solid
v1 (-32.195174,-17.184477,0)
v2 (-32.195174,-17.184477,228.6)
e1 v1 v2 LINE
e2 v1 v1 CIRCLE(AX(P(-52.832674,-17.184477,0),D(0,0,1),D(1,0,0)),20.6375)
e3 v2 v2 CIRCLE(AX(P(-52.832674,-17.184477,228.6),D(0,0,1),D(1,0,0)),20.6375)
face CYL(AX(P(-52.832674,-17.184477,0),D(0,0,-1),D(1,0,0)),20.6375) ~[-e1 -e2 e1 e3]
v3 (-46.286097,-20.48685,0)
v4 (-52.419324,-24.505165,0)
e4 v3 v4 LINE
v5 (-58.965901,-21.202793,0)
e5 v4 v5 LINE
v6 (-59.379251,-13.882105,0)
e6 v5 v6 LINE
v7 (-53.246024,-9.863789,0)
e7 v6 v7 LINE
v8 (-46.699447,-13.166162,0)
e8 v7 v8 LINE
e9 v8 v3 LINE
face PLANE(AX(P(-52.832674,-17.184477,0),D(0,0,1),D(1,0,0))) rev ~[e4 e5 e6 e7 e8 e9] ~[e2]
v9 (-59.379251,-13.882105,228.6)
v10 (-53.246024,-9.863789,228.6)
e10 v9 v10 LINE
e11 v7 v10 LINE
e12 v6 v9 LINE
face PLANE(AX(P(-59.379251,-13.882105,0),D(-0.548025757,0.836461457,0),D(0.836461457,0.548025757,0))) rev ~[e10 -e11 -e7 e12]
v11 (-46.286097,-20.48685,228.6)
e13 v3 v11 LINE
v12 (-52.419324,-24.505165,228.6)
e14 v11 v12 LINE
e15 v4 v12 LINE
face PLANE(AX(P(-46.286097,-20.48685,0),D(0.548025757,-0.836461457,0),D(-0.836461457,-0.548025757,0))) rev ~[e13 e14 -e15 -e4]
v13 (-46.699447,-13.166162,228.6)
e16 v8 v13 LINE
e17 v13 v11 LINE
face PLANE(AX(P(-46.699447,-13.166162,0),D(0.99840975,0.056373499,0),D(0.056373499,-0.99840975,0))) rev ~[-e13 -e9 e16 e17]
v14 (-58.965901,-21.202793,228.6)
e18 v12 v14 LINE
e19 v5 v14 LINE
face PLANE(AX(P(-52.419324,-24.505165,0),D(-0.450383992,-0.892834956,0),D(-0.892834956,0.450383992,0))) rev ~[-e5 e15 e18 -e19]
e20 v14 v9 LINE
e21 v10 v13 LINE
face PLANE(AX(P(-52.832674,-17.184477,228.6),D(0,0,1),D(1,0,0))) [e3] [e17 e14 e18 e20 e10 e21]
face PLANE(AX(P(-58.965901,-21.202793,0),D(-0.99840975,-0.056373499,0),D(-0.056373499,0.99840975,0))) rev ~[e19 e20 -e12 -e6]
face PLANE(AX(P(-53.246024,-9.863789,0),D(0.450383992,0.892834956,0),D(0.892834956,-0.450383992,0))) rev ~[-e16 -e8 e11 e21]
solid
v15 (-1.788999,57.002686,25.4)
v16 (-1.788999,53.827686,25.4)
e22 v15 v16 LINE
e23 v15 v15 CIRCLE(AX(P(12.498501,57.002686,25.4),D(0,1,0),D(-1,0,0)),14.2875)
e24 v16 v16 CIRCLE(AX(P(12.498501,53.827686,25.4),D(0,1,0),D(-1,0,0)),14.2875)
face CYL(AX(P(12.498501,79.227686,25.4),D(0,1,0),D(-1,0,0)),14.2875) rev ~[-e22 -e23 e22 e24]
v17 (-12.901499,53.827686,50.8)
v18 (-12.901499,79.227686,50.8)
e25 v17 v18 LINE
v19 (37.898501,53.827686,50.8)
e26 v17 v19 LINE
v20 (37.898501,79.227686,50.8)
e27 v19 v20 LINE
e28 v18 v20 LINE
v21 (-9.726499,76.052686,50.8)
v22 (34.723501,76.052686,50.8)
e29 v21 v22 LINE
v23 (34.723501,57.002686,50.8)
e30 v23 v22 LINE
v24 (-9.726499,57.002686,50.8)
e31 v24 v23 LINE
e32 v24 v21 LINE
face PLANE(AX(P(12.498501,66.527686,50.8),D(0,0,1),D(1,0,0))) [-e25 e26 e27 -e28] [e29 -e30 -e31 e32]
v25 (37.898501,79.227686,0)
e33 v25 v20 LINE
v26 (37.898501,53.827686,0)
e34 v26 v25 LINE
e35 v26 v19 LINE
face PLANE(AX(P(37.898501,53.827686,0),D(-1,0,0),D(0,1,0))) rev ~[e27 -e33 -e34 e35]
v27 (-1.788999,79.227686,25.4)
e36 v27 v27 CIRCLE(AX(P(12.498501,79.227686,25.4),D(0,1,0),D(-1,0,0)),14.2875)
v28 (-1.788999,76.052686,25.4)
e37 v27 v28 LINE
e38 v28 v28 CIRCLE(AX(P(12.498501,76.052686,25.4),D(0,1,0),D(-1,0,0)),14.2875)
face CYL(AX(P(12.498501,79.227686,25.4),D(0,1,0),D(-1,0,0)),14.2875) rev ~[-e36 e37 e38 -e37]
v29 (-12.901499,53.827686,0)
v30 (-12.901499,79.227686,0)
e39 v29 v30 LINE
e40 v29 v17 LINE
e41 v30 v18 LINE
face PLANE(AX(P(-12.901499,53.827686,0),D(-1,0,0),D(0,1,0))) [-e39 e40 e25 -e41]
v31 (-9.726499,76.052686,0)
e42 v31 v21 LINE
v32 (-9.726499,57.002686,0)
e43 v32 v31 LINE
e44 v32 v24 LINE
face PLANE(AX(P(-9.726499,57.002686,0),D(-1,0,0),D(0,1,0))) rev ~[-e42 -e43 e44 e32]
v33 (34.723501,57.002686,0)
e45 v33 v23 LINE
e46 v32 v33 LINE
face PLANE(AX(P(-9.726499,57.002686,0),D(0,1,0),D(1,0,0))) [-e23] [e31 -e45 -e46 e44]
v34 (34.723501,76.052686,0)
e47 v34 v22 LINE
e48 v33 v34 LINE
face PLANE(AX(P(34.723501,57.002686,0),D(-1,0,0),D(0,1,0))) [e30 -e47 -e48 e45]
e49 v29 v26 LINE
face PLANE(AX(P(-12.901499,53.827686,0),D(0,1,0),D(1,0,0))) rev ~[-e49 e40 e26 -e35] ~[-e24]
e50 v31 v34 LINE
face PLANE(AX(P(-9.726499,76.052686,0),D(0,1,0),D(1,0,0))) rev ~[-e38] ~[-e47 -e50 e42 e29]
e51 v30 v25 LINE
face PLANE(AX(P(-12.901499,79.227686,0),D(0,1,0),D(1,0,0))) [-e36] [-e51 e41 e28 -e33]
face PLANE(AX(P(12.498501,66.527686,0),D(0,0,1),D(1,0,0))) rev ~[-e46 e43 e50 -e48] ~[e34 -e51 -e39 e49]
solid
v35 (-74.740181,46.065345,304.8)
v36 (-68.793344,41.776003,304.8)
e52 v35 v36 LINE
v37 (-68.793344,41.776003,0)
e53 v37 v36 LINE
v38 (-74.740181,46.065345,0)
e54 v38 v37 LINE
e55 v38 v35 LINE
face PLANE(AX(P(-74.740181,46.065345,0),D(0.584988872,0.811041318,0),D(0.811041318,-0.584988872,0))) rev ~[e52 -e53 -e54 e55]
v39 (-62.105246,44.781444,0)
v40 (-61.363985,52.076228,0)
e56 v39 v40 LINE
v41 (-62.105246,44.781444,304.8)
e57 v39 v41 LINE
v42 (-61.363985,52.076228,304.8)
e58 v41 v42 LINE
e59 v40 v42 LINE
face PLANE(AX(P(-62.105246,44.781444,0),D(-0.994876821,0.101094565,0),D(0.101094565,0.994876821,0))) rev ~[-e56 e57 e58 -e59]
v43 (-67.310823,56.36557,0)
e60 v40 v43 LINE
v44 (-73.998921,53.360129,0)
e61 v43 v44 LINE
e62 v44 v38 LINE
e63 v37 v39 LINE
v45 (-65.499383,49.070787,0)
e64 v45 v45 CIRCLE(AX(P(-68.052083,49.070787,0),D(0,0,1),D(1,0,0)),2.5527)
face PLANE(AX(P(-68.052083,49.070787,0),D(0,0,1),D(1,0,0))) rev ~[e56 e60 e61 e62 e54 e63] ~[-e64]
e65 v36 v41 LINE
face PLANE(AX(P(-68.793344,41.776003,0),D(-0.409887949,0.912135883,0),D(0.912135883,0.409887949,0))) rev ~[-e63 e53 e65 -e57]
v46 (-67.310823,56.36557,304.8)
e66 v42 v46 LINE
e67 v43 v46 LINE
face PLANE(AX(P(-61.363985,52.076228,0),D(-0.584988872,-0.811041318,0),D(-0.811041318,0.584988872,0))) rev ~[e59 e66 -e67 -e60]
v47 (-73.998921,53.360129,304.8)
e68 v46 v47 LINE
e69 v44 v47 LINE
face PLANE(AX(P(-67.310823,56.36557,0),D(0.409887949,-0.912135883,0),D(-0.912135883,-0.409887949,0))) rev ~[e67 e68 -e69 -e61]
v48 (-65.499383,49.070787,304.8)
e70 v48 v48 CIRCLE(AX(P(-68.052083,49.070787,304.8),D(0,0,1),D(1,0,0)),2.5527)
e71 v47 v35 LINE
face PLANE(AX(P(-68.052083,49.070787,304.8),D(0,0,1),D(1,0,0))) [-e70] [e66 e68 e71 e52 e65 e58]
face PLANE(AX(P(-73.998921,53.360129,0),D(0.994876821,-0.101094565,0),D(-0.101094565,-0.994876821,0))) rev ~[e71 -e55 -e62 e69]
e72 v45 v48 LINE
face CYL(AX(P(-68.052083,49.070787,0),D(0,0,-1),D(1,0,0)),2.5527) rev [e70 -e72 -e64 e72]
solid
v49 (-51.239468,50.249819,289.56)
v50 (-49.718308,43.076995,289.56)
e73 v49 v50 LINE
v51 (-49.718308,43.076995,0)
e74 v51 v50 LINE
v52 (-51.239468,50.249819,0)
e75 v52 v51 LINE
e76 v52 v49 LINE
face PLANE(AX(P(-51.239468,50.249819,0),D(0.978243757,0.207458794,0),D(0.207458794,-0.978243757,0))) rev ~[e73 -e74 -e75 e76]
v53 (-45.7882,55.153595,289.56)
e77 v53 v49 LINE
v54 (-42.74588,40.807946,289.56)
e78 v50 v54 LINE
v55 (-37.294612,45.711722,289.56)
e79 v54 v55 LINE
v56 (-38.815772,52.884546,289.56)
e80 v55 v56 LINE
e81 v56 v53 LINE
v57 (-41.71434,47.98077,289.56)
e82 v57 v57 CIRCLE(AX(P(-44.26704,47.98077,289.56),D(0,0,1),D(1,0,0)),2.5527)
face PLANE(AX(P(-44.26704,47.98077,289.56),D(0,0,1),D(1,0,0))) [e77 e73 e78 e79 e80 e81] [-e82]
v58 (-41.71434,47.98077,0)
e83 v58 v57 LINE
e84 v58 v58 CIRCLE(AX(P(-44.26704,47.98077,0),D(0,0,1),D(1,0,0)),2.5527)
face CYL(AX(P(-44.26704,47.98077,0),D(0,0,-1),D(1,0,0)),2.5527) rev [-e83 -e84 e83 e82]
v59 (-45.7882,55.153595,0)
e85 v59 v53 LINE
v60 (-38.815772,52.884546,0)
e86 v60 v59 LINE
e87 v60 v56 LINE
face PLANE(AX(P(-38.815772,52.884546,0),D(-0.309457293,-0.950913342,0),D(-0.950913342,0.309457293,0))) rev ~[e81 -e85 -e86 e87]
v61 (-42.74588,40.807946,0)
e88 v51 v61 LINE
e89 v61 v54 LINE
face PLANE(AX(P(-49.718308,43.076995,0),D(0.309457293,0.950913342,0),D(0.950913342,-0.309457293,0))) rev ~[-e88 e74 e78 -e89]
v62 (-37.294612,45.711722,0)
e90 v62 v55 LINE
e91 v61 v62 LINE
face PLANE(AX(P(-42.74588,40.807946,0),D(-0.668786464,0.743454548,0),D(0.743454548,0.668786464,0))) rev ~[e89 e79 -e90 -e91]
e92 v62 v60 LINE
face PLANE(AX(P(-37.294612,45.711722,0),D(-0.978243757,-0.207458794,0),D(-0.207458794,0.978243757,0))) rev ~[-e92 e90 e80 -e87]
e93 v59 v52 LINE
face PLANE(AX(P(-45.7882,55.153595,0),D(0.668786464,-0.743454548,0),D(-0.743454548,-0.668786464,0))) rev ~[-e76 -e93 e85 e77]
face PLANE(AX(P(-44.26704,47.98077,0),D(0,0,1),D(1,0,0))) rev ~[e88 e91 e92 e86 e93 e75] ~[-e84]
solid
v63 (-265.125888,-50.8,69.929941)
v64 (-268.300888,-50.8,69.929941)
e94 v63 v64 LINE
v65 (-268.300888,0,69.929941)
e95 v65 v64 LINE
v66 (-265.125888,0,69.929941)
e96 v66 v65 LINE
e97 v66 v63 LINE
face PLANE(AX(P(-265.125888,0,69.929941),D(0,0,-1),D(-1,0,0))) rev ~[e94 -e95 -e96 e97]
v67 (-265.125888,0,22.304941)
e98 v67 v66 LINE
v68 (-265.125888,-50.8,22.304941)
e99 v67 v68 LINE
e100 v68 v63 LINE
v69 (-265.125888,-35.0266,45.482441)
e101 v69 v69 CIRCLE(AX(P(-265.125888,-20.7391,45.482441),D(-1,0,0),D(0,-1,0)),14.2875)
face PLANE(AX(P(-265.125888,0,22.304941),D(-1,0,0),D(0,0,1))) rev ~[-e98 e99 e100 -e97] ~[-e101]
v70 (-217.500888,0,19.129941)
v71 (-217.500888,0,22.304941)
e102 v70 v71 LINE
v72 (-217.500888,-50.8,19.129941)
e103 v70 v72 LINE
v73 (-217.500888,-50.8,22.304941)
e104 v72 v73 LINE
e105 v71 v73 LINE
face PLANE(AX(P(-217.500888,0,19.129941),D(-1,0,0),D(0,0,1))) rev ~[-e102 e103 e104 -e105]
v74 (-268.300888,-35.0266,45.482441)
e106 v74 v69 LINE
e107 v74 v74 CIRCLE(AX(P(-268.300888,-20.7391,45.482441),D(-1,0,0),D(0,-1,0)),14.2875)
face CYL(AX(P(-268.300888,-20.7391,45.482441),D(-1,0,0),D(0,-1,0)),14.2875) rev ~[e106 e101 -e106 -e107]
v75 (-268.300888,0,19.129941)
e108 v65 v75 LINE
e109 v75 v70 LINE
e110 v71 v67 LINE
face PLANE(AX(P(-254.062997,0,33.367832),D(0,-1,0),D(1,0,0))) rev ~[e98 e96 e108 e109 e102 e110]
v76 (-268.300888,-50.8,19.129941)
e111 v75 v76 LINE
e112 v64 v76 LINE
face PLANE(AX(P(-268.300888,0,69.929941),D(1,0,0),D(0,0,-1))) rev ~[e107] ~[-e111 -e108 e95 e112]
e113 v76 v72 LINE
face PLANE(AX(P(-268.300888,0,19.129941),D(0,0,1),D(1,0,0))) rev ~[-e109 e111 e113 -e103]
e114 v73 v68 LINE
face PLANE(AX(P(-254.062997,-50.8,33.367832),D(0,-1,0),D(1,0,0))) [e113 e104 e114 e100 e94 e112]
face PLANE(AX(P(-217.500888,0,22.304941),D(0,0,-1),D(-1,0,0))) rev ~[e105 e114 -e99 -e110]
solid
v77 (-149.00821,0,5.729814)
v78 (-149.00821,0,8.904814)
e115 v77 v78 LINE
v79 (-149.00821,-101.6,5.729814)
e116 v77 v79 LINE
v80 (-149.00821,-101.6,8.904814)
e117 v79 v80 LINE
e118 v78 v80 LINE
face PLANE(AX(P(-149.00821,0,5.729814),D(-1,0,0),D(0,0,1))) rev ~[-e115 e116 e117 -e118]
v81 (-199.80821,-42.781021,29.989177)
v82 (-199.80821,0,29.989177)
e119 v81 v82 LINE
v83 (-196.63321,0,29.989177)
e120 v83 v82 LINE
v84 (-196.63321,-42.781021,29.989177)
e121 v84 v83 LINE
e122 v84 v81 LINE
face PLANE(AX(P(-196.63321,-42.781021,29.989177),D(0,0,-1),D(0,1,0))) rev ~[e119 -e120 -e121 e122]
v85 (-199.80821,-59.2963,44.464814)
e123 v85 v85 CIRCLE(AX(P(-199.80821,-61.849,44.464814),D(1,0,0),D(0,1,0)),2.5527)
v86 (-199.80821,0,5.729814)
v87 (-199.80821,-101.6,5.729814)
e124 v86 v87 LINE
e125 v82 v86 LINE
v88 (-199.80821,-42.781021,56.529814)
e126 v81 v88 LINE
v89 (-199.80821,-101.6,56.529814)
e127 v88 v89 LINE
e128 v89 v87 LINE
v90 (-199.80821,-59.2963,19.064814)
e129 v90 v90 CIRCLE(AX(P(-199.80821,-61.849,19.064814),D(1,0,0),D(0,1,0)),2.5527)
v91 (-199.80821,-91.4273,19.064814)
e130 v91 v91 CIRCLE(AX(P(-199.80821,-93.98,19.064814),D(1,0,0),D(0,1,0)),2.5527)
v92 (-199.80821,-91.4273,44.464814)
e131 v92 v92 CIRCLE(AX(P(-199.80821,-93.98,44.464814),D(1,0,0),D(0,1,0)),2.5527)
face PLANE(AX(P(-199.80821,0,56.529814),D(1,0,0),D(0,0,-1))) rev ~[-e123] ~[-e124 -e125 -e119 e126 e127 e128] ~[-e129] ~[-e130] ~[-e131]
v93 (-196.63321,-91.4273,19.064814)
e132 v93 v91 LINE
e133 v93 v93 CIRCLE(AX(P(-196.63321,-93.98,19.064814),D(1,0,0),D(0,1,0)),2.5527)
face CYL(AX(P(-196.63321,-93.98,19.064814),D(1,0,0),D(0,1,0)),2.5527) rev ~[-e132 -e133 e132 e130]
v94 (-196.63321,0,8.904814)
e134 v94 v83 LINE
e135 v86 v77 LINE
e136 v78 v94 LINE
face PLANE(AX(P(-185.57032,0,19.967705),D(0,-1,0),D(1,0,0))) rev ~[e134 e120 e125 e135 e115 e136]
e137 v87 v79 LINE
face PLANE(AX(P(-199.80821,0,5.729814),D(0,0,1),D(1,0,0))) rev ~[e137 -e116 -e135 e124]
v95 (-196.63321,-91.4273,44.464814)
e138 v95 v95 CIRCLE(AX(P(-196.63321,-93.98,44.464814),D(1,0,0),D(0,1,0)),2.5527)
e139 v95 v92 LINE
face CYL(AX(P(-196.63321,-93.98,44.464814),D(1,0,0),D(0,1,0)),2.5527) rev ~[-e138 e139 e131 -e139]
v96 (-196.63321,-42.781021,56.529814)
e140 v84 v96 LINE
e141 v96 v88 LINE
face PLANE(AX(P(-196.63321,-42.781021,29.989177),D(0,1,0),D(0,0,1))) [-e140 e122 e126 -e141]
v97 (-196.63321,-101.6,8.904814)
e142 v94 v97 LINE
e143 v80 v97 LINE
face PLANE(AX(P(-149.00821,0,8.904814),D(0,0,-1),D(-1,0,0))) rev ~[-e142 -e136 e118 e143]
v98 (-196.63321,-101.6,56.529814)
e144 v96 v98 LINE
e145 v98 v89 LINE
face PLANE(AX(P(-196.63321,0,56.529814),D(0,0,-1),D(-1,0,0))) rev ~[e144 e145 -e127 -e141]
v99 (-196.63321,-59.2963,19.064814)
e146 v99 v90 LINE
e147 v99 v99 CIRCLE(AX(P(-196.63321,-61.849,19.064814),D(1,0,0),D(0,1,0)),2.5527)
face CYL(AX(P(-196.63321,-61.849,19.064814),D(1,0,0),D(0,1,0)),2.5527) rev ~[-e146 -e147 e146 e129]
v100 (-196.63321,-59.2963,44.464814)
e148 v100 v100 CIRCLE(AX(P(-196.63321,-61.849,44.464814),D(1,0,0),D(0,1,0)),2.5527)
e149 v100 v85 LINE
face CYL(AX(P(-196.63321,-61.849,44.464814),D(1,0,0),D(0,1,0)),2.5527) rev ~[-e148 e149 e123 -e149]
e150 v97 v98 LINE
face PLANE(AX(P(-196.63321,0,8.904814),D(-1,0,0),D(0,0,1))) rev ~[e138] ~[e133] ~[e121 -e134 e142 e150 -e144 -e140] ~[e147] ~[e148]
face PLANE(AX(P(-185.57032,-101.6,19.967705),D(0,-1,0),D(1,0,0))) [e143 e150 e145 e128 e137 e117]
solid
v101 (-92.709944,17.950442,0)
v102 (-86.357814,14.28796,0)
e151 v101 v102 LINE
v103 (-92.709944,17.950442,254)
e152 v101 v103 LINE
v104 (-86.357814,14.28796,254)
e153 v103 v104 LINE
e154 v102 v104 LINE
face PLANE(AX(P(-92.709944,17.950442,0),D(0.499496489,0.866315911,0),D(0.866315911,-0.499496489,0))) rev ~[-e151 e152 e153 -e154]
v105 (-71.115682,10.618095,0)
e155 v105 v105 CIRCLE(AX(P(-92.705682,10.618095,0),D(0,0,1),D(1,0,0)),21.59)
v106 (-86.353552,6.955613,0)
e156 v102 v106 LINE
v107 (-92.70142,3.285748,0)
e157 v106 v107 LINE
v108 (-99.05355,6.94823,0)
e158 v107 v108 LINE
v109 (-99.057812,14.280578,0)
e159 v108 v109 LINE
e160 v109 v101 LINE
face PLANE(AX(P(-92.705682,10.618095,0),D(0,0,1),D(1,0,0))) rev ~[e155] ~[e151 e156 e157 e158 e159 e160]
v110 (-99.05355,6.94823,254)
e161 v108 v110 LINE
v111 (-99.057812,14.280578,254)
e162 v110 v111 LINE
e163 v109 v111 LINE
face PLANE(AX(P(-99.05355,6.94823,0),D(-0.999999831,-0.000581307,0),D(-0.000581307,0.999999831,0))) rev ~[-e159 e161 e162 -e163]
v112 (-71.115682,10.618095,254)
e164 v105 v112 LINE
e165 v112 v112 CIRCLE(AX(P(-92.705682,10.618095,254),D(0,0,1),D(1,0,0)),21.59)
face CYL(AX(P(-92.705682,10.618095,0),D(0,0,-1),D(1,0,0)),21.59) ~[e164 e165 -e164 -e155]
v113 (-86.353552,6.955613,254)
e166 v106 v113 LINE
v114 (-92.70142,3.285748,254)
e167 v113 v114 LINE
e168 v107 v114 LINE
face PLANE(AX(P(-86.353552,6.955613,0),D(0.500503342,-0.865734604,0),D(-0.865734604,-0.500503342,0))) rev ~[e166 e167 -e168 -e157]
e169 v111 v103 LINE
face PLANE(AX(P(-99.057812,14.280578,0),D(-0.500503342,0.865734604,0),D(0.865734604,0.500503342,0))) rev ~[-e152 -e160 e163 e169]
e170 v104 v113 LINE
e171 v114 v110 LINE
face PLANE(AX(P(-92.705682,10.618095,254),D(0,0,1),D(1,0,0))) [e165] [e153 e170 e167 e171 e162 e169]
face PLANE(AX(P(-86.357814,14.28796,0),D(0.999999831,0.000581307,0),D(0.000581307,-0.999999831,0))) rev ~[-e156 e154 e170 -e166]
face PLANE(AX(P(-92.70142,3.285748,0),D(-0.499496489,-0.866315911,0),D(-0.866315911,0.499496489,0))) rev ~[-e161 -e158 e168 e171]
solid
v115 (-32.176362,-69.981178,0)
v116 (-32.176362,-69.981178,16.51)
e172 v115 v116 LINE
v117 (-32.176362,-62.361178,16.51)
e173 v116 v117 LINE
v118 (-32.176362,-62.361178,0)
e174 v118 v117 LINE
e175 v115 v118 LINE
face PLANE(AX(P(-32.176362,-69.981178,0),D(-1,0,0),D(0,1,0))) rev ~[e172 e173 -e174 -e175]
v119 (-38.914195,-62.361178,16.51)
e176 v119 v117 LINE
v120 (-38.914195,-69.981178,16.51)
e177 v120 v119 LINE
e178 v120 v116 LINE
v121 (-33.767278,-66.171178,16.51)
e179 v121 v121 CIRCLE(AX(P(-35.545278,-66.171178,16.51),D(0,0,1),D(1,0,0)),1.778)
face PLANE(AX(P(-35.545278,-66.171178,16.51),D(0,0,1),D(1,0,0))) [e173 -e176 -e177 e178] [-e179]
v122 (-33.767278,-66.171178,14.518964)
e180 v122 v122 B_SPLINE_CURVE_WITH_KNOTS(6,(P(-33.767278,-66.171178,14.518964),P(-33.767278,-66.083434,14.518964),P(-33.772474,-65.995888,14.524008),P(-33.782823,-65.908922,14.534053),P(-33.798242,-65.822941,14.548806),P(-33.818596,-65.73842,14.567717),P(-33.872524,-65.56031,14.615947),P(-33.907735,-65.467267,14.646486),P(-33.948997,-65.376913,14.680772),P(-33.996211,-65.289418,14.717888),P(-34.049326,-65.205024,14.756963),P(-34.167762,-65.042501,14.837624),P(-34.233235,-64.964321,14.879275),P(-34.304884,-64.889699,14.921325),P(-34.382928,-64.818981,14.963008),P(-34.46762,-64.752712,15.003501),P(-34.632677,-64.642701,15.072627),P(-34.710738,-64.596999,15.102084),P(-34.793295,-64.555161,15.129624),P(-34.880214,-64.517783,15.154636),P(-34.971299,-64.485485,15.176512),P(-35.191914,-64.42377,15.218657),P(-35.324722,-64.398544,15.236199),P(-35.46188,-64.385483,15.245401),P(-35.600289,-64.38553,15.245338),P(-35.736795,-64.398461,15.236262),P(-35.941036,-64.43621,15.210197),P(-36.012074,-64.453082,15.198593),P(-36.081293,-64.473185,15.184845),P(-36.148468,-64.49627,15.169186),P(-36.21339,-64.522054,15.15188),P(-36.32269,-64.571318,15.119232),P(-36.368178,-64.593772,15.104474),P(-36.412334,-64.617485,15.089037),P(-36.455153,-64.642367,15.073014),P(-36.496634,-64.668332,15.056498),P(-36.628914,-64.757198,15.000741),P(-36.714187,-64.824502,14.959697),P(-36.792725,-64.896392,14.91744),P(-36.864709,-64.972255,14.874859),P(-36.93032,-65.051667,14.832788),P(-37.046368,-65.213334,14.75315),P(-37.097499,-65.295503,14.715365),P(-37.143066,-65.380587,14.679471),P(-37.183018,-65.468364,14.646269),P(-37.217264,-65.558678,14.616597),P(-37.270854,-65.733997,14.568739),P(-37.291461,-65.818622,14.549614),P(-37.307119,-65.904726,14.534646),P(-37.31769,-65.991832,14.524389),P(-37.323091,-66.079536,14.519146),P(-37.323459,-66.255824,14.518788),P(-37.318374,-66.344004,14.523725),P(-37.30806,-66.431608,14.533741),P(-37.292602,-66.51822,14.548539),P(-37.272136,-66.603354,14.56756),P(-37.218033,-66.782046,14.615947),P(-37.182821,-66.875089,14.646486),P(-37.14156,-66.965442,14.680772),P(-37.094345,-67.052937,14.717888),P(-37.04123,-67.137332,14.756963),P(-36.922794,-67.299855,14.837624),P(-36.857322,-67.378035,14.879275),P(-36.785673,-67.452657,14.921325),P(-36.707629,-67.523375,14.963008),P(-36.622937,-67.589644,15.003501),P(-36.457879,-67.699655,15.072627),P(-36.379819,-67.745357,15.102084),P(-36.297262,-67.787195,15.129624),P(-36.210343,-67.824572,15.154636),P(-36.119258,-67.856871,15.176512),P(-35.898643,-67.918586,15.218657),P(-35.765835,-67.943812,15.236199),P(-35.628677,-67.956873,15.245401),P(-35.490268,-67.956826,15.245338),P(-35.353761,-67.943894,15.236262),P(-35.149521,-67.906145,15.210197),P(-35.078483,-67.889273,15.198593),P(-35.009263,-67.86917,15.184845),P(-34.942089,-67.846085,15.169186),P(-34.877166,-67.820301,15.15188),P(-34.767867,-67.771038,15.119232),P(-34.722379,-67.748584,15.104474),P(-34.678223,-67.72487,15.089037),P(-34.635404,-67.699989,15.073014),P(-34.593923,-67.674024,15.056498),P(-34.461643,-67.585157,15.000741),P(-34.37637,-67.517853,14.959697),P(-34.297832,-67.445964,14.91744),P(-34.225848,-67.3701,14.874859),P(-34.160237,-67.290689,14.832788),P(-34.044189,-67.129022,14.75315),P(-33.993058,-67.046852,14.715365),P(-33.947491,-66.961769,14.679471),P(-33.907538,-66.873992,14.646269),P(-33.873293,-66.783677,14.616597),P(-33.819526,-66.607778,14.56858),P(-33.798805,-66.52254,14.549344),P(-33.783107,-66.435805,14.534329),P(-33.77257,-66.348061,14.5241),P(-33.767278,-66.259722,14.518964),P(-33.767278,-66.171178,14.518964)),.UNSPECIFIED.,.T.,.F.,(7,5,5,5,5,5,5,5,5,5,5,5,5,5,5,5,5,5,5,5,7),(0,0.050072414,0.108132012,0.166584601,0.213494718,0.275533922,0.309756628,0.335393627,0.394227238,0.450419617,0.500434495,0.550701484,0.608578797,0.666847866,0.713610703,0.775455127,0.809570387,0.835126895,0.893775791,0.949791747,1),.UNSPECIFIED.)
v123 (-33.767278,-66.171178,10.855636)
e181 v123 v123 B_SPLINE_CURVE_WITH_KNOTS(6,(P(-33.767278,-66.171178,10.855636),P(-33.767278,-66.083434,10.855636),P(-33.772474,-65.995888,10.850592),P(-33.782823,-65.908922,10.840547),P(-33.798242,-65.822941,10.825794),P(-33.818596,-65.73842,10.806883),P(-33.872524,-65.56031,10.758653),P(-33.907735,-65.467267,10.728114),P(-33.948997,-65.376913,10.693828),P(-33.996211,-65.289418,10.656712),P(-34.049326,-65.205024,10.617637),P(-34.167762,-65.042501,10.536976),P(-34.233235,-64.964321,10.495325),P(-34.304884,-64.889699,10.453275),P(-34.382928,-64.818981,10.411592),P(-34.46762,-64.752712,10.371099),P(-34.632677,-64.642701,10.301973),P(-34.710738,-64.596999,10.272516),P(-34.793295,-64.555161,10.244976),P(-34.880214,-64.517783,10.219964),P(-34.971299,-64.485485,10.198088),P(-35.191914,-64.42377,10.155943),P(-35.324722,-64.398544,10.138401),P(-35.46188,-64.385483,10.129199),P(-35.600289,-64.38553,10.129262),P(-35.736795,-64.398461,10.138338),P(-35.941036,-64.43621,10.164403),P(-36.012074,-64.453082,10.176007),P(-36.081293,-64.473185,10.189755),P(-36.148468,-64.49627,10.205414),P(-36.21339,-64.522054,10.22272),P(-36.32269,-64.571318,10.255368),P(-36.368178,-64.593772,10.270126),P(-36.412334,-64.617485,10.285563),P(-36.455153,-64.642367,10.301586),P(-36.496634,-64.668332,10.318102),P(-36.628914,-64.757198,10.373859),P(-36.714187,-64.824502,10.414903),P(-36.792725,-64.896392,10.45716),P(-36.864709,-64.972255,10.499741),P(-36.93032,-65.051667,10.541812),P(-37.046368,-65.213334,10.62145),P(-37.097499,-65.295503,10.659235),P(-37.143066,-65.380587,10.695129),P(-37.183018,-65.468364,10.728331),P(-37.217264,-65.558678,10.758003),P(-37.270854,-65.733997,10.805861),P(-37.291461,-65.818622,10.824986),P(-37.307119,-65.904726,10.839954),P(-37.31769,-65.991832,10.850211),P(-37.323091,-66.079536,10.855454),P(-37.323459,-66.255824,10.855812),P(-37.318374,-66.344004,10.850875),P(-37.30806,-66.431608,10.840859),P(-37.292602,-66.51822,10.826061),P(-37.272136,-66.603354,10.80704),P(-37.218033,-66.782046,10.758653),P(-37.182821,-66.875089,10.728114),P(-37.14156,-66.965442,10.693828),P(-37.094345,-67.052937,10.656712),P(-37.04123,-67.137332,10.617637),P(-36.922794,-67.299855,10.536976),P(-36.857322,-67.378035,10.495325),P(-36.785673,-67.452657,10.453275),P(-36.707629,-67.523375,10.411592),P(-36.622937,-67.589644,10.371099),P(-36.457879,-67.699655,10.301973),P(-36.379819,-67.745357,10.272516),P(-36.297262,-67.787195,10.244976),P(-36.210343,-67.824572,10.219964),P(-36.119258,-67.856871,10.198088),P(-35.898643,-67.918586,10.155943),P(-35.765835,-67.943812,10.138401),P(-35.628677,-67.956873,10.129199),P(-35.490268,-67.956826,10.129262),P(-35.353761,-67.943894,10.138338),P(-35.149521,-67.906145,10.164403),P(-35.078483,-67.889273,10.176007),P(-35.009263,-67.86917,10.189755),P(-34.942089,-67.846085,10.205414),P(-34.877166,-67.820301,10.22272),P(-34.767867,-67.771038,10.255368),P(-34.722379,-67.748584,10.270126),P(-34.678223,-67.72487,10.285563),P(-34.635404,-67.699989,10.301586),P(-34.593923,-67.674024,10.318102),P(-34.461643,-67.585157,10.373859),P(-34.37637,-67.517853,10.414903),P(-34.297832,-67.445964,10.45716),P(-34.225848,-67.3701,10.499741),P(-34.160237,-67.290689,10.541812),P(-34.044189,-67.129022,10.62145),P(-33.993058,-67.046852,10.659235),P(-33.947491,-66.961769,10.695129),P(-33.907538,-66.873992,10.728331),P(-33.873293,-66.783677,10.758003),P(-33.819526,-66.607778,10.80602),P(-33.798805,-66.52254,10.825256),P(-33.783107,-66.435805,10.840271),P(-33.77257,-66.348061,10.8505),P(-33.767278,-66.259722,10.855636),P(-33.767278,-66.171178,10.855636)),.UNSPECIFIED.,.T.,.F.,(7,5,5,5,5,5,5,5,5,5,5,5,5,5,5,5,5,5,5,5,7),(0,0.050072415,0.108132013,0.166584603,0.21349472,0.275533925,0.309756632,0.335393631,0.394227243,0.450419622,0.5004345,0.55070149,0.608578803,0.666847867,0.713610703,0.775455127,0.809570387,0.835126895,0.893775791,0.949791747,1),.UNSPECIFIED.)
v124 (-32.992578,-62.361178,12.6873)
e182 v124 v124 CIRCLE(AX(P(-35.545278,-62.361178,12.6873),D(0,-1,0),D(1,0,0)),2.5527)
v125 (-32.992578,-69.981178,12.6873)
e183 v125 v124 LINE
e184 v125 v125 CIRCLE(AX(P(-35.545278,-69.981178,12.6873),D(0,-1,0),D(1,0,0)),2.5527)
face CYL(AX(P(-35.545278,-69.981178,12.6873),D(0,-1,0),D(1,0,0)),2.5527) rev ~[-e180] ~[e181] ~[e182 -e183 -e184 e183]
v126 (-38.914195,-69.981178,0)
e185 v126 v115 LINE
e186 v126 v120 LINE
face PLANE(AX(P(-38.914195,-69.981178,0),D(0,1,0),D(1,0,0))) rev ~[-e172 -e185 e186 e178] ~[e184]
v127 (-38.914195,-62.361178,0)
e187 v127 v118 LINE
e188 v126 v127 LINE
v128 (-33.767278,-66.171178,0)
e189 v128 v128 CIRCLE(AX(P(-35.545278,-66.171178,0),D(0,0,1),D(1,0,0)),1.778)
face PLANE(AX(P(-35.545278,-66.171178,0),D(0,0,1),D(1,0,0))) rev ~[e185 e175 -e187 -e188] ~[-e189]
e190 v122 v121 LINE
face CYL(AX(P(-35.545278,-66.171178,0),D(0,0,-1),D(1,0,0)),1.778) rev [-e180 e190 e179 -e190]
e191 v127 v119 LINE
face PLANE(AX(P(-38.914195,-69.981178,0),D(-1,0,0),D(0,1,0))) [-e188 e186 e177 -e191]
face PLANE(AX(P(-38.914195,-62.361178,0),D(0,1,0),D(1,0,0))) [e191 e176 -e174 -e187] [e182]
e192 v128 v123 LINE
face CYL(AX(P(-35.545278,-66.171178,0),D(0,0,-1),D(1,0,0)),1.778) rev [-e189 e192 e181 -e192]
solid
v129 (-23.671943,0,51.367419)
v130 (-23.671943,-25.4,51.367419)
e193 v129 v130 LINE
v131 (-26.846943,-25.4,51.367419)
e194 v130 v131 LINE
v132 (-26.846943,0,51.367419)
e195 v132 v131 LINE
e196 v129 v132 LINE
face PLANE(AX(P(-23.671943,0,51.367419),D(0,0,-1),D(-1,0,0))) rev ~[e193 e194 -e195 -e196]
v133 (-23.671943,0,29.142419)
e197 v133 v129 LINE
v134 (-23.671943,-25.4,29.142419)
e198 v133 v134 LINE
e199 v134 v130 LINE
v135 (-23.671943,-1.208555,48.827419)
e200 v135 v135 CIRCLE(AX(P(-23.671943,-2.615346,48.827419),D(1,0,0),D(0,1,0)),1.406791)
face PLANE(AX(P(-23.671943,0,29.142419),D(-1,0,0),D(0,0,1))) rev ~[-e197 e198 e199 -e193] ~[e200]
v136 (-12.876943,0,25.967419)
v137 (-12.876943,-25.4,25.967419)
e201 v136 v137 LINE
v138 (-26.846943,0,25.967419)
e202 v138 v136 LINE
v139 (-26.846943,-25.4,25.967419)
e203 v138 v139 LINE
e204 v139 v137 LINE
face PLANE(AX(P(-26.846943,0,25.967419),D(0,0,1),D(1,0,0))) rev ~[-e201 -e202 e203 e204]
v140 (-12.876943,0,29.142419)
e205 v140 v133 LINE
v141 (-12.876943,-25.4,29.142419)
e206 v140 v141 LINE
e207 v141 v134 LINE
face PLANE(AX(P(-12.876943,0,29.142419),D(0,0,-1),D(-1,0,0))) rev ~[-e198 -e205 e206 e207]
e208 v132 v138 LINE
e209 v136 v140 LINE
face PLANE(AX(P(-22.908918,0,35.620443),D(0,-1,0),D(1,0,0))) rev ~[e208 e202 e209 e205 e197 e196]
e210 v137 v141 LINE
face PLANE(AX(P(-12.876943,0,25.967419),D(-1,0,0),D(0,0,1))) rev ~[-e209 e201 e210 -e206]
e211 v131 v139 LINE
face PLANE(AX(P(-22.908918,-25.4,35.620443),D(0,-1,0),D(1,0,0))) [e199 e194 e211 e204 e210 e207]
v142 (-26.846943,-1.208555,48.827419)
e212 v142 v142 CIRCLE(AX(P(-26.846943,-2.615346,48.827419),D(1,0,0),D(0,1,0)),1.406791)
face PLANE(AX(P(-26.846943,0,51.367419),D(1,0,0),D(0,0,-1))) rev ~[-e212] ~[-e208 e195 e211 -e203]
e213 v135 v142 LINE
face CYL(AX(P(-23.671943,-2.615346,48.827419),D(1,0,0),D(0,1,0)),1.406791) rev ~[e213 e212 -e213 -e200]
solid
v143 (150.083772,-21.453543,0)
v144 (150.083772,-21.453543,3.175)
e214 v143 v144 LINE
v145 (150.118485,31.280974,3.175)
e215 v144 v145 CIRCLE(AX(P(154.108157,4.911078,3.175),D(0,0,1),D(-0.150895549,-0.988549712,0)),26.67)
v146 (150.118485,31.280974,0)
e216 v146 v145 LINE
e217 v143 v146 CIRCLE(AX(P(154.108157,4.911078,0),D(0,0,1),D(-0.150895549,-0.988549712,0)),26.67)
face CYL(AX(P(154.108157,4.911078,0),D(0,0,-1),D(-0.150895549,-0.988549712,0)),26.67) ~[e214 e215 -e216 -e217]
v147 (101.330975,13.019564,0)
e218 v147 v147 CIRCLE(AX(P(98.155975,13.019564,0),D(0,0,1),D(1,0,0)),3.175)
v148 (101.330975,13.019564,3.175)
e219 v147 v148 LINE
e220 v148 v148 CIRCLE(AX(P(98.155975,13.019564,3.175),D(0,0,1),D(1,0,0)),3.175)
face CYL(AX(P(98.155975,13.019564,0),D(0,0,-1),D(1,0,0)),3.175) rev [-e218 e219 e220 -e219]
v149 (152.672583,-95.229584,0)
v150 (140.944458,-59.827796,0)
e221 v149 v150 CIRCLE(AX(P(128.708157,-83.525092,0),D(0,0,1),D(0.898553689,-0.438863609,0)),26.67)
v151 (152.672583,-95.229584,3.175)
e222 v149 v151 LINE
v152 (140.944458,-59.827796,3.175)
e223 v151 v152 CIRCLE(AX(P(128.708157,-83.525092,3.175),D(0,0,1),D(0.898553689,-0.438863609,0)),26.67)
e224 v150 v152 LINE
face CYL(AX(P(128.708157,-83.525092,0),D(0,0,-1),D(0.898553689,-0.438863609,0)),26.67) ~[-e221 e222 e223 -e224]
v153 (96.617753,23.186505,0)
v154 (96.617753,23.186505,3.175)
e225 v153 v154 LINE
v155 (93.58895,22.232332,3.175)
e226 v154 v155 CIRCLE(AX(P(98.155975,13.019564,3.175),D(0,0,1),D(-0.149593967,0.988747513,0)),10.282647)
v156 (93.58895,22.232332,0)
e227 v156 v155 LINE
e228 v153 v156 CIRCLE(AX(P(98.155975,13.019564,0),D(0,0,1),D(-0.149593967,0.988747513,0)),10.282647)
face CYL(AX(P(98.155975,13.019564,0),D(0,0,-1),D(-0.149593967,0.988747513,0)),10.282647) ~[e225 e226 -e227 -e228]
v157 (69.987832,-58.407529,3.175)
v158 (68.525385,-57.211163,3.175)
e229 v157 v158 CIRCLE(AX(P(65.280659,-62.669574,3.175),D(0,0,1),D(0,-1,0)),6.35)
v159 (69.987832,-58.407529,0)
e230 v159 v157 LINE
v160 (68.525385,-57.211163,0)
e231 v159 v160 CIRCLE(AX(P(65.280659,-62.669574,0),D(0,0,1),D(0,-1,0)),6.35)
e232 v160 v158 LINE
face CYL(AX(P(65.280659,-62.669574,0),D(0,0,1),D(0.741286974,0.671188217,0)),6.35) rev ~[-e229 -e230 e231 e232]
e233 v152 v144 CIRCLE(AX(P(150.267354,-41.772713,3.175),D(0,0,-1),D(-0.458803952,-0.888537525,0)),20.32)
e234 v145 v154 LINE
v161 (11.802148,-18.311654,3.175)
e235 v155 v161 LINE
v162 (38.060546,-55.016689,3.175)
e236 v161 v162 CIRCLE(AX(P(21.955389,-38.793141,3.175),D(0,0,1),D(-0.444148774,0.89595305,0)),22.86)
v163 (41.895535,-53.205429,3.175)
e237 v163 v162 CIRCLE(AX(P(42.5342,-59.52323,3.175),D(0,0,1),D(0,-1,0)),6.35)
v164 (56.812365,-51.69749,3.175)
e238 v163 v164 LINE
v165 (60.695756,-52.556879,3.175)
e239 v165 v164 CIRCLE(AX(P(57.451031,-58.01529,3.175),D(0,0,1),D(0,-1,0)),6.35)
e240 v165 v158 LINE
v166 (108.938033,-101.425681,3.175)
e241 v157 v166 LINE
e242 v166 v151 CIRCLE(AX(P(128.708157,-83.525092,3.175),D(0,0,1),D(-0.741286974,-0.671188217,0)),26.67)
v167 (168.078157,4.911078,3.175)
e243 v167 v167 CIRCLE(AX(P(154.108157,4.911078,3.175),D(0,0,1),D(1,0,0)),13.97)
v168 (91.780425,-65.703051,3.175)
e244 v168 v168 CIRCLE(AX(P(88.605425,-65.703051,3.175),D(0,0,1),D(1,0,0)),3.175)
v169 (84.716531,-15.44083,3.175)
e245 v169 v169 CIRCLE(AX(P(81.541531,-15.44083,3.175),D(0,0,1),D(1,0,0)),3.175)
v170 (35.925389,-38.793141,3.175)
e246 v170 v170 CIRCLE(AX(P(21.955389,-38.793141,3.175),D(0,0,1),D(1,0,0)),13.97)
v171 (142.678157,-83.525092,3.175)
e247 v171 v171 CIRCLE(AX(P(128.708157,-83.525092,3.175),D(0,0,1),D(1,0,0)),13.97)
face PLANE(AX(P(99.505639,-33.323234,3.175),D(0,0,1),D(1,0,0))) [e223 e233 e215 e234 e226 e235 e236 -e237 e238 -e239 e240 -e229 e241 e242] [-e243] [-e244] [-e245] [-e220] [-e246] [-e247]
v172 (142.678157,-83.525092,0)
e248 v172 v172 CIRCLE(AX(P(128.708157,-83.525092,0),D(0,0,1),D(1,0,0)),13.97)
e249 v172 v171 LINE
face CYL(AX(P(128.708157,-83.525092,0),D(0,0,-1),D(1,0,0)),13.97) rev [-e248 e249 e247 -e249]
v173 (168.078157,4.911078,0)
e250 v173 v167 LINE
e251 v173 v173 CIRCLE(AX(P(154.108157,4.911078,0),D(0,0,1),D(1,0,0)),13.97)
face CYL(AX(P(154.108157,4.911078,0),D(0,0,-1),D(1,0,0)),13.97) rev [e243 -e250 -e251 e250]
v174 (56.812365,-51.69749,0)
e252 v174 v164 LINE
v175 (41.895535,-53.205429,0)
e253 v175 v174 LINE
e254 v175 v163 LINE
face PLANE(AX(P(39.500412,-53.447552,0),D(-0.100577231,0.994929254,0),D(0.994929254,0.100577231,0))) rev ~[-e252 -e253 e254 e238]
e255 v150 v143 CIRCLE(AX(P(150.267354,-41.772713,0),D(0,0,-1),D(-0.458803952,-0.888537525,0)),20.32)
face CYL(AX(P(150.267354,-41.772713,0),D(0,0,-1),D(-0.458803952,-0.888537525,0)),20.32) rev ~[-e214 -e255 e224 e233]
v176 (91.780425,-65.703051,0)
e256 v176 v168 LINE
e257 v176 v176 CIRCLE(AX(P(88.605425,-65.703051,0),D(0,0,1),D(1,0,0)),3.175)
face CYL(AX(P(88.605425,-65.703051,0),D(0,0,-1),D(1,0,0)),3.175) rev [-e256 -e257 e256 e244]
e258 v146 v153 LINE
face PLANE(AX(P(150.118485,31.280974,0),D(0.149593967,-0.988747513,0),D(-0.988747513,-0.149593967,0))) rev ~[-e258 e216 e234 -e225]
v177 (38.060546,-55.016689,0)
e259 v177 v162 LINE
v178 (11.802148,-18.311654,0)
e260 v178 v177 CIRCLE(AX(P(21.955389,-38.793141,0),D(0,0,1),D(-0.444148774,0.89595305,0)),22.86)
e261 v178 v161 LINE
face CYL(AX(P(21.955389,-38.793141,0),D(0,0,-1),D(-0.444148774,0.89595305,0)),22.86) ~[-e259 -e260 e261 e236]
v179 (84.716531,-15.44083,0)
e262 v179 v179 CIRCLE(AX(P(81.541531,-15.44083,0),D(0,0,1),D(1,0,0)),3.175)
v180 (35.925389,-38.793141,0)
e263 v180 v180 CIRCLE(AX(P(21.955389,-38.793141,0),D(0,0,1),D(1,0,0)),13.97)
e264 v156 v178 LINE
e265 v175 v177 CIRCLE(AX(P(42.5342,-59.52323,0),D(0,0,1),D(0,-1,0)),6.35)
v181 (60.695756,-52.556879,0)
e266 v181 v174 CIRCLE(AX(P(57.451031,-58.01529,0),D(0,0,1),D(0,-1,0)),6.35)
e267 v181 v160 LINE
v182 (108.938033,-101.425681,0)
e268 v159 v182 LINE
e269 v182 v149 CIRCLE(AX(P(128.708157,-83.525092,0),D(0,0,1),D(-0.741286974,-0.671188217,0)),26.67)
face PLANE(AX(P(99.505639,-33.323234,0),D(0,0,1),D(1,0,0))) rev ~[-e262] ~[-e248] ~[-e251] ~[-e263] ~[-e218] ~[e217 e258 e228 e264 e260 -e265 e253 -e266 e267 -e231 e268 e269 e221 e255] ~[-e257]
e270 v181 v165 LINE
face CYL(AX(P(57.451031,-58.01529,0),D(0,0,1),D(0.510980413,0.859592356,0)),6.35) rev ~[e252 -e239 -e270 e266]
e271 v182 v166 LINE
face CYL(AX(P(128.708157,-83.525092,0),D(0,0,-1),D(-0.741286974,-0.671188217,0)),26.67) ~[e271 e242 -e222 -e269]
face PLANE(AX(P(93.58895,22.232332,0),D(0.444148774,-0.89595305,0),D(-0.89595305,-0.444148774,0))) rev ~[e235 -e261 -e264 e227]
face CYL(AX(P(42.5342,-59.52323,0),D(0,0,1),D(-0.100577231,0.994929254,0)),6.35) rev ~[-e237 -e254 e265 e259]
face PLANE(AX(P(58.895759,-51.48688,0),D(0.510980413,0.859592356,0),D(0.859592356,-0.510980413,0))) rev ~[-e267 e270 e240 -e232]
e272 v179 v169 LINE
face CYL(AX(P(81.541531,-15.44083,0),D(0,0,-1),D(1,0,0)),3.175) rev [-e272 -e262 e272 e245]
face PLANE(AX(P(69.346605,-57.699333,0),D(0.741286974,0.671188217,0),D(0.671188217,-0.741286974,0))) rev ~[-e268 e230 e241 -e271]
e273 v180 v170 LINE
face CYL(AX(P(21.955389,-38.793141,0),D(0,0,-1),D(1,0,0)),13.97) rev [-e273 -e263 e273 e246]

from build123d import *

# Parameters (mm, degrees)
F0_R      = 2.5527
F1_DEPTH  = 289.56
F2_DEPTH  = 304.8
F3_R      = 3.175
F3_R_2    = 13.97
F4_DEPTH  = 3.175
F5_R      = 21.59
F6_DEPTH  = 254
F7_R      = 20.6375
F8_DEPTH  = 228.6
F9_R      = 6.35
F10_W     = 50.8
F10_H     = 25.4
F10_W_2   = 44.45
F10_H_2   = 19.05
F11_DEPTH = 50.8
F12_R     = 14.2875
F13_DEPTH = 25.4
F15_DEPTH = 101.6
F16_R     = 2.5527
F16_W     = 42.781021446
F16_H     = 26.5406374857
F17_DEPTH = 3.175
F19_DEPTH = 25.4
F20_R     = 1.4067906503
F21_DEPTH = 3.175
F22_W     = 6.7378332439
F22_H     = 7.62
F22_R     = 1.778
F23_DEPTH = 16.51
F24_R     = 2.5527
F25_DEPTH = 7.62
F27_DEPTH = 50.8
F28_R     = 14.2875
F29_DEPTH = 25.4


# Not quite as in the source:
# - a feature names something its author has since deleted; it is built from what else it names


with BuildPart() as f1:
    # F0 (on Top) → F1 (new body)
    with BuildSketch(Plane.XY):
        Polygon((-49.7183075275, 43.0769950958), (-42.7458795893, 40.8079464007), (-37.2946118079, 45.7117217736), (-38.8157719646, 52.8845458417), (-45.7881999028, 55.1535945367), (-51.2394676842, 50.2498191638), align=None)
        with Locations((-44.267039746, 47.9807704687)):
            Circle(F0_R, mode=Mode.SUBTRACT)
    extrude(amount=F1_DEPTH)


with BuildPart() as f2:
    # F0 (on Top) → F2 (new body)
    with BuildSketch(Plane.XY):
        Polygon((-68.7933438248, 41.7760031993), (-62.1052457259, 44.7814444568), (-61.3639851549, 52.0762279422), (-67.3108226829, 56.3655701702), (-73.9989207819, 53.3601289127), (-74.7401813528, 46.0653454273), align=None)
        with Locations((-68.0520832539, 49.0707866848)):
            Circle(F0_R, mode=Mode.SUBTRACT)
    extrude(amount=F2_DEPTH)


with BuildPart() as f4:
    # F3 (on Top) → F4 (new body)
    with BuildSketch(Plane.XY):
        with BuildLine():
            ThreePointArc((140.9444579385, -59.8277957087), (130.5002323104, -37.0649228102), (150.0837722501, -21.4535425063))
            ThreePointArc((150.0837722501, -21.4535425063), (180.7781507554, 4.8935224463), (150.1184854314, 31.2809744958))
            Line((150.1184854314, 31.2809744958), (96.617753451, 23.1865048445))
            ThreePointArc((96.617753451, 23.1865048445), (95.0662956112, 22.8270454376), (93.588950484, 22.2323321711))
            Line((93.588950484, 22.2323321711), (11.8021475778, -18.3116541727))
            ThreePointArc((11.8021475778, -18.3116541727), (4.0028834206, -52.9454255019), (39.5004115999, -53.4475520253))
            Line((39.5004115999, -53.4475520253), (58.8957592845, -51.4868795872))
            Line((58.8957592845, -51.4868795872), (69.3466052871, -57.6993331615))
            Line((69.3466052871, -57.6993331615), (108.9380329404, -101.4256812442))
            ThreePointArc((108.9380329404, -101.4256812442), (132.4492727351, -109.9313966124), (152.6725834267, -95.2295839597))
            ThreePointArc((152.6725834267, -95.2295839597), (154.0250448726, -75.1379546349), (140.9444579385, -59.8277957087))
        make_face()
        with Locations((88.6054252238, -65.7030506208)):
            Circle(F3_R, mode=Mode.SUBTRACT)
        with Locations((128.7081565336, -83.5250915023)):
            Circle(F3_R_2, mode=Mode.SUBTRACT)
        with Locations((21.9553885414, -38.7931408847)):
            Circle(F3_R_2, mode=Mode.SUBTRACT)
        with Locations((81.5415307879, -15.4408300295)):
            Circle(F3_R, mode=Mode.SUBTRACT)
        with Locations((98.1559753418, 13.0195636302)):
            Circle(F3_R, mode=Mode.SUBTRACT)
        with Locations((154.1081565336, 4.9110783167)):
            Circle(F3_R_2, mode=Mode.SUBTRACT)
    extrude(amount=F4_DEPTH)

    # F9
    f9_edges = [f4.edges().sort_by_distance(p)[0] for p in [
        (108.938033, -101.425681, 1.5875),
        (39.500412, -53.447552, 1.5875),
        (58.895759, -51.48688, 1.5875),
        (69.346605, -57.699333, 1.5875),
    ]]
    fillet(f9_edges, radius=F9_R)


with BuildPart() as f6:
    # F5 (on Top) → F6 (new body)
    with BuildSketch(Plane.XY):
        with Locations((-92.7056819201, 10.6180952862)):
            Circle(F5_R)
        Polygon((-86.3578141646, 14.2879601737), (-86.3535518213, 6.9556129938), (-92.7014195768, 3.2857481063), (-99.0535496755, 6.9482303987), (-99.0578120188, 14.2805775786), (-92.7099442633, 17.950442466), align=None, mode=Mode.SUBTRACT)
    extrude(amount=F6_DEPTH)


with BuildPart() as f8:
    # F7 (on Top) → F8 (new body)
    with BuildSketch(Plane.XY):
        with Locations((-52.8326742351, -17.1844772995)):
            Circle(F7_R)
        Polygon((-46.699447393, -13.1661615035), (-46.2860972543, -20.4868496539), (-52.4193240964, -24.5051654499), (-58.9659010772, -21.2027930955), (-59.3792512159, -13.882104945), (-53.2460243738, -9.863789149), align=None, mode=Mode.SUBTRACT)
    extrude(amount=F8_DEPTH)


with BuildPart() as f11:
    # F10 (on Top) → F11 (new body)
    with BuildSketch(Plane.XY):
        with Locations((12.4985007569, 66.5276864394)):
            Rectangle(F10_W, F10_H)
        with Locations((12.4985007569, 66.5276864394)):
            Rectangle(F10_W_2, F10_H_2, mode=Mode.SUBTRACT)
    extrude(amount=F11_DEPTH)

    # F12 (on face) → F13 (cut, through all)
    with BuildSketch(Plane(origin=(0, 79.2276864394, 0), x_dir=(-1, 0, 0), z_dir=(0, 1, 0))):
        with Locations((-12.4985007569, 25.4)):
            Circle(F12_R)
    extrude(amount=-F13_DEPTH, mode=Mode.SUBTRACT)


with BuildPart() as f15:
    # F14 (on Front) → F15 (new body)
    with BuildSketch(Plane.XZ):
        Polygon((-196.6332101345, 56.52981406), (-199.8082101345, 56.52981406), (-199.8082101345, 5.72981406), (-149.0082101345, 5.72981406), (-149.0082101345, 8.90481406), (-196.6332101345, 8.90481406), align=None)
    extrude(amount=F15_DEPTH)

    # F16 (on face) → F17 (cut, through all)
    with BuildSketch(Plane.YZ.offset(-196.6332101345)):
        with Locations((-93.98, 44.46481406)):
            Circle(F16_R)
        with Locations((-93.98, 19.06481406)):
            Circle(F16_R)
        with Locations((-61.849, 19.06481406)):
            Circle(F16_R)
        with Locations((-61.849, 44.46481406)):
            Circle(F16_R)
        with Locations((-21.390510723, 43.2594953172)):
            Rectangle(F16_W, F16_H)
    extrude(amount=-F17_DEPTH, mode=Mode.SUBTRACT)


with BuildPart() as f19:
    # F18 (on Front) → F19 (new body)
    with BuildSketch(Plane.XZ):
        Polygon((-23.6719425689, 51.3674189275), (-26.8469425689, 51.3674189275), (-26.8469425689, 25.9674189275), (-12.8769425689, 25.9674189275), (-12.8769425689, 29.1424189275), (-23.6719425689, 29.1424189275), align=None)
    extrude(amount=F19_DEPTH)

    # F20 (on face) → F21 (cut, through all)
    with BuildSketch(Plane.YZ.offset(-23.6719425689)):
        with Locations((-2.615345642, 48.8274189275)):
            Circle(F20_R)
    extrude(amount=-F21_DEPTH, mode=Mode.SUBTRACT)


with BuildPart() as f23:
    # F22 (on Top) → F23 (new body)
    with BuildSketch(Plane.XY):
        with Locations((-35.5452783406, -66.1711778778)):
            Rectangle(F22_W, F22_H)
        with Locations((-35.5452783406, -66.1711778778)):
            Circle(F22_R, mode=Mode.SUBTRACT)
    extrude(amount=F23_DEPTH)

    # F24 (on face) → F25 (cut, through all)
    with BuildSketch(Plane.XZ.offset(69.9811778778)):
        with Locations((-35.5452783406, 12.6873)):
            Circle(F24_R)
    extrude(amount=-F25_DEPTH, mode=Mode.SUBTRACT)


with BuildPart() as f27:
    # F26 (on Front) → F27 (new body)
    with BuildSketch(Plane.XZ):
        Polygon((-265.1258880146, 69.9299412084), (-268.3008880146, 69.9299412084), (-268.3008880146, 19.1299412084), (-217.5008880146, 19.1299412084), (-217.5008880146, 22.3049412084), (-265.1258880146, 22.3049412084), align=None)
    extrude(amount=F27_DEPTH)

    # F28 (on face) → F29 (cut)
    with BuildSketch(Plane(origin=(-268.3008880146, 0, 0), x_dir=(0, -1, 0), z_dir=(-1, 0, 0))):
        with Locations((20.7391, 45.4824412084)):
            Circle(F28_R)
    extrude(amount=-F29_DEPTH, mode=Mode.SUBTRACT)


solid = Compound([f1.part, f2.part, f4.part, f6.part, f8.part, f11.part, f15.part, f19.part, f23.part, f27.part])
